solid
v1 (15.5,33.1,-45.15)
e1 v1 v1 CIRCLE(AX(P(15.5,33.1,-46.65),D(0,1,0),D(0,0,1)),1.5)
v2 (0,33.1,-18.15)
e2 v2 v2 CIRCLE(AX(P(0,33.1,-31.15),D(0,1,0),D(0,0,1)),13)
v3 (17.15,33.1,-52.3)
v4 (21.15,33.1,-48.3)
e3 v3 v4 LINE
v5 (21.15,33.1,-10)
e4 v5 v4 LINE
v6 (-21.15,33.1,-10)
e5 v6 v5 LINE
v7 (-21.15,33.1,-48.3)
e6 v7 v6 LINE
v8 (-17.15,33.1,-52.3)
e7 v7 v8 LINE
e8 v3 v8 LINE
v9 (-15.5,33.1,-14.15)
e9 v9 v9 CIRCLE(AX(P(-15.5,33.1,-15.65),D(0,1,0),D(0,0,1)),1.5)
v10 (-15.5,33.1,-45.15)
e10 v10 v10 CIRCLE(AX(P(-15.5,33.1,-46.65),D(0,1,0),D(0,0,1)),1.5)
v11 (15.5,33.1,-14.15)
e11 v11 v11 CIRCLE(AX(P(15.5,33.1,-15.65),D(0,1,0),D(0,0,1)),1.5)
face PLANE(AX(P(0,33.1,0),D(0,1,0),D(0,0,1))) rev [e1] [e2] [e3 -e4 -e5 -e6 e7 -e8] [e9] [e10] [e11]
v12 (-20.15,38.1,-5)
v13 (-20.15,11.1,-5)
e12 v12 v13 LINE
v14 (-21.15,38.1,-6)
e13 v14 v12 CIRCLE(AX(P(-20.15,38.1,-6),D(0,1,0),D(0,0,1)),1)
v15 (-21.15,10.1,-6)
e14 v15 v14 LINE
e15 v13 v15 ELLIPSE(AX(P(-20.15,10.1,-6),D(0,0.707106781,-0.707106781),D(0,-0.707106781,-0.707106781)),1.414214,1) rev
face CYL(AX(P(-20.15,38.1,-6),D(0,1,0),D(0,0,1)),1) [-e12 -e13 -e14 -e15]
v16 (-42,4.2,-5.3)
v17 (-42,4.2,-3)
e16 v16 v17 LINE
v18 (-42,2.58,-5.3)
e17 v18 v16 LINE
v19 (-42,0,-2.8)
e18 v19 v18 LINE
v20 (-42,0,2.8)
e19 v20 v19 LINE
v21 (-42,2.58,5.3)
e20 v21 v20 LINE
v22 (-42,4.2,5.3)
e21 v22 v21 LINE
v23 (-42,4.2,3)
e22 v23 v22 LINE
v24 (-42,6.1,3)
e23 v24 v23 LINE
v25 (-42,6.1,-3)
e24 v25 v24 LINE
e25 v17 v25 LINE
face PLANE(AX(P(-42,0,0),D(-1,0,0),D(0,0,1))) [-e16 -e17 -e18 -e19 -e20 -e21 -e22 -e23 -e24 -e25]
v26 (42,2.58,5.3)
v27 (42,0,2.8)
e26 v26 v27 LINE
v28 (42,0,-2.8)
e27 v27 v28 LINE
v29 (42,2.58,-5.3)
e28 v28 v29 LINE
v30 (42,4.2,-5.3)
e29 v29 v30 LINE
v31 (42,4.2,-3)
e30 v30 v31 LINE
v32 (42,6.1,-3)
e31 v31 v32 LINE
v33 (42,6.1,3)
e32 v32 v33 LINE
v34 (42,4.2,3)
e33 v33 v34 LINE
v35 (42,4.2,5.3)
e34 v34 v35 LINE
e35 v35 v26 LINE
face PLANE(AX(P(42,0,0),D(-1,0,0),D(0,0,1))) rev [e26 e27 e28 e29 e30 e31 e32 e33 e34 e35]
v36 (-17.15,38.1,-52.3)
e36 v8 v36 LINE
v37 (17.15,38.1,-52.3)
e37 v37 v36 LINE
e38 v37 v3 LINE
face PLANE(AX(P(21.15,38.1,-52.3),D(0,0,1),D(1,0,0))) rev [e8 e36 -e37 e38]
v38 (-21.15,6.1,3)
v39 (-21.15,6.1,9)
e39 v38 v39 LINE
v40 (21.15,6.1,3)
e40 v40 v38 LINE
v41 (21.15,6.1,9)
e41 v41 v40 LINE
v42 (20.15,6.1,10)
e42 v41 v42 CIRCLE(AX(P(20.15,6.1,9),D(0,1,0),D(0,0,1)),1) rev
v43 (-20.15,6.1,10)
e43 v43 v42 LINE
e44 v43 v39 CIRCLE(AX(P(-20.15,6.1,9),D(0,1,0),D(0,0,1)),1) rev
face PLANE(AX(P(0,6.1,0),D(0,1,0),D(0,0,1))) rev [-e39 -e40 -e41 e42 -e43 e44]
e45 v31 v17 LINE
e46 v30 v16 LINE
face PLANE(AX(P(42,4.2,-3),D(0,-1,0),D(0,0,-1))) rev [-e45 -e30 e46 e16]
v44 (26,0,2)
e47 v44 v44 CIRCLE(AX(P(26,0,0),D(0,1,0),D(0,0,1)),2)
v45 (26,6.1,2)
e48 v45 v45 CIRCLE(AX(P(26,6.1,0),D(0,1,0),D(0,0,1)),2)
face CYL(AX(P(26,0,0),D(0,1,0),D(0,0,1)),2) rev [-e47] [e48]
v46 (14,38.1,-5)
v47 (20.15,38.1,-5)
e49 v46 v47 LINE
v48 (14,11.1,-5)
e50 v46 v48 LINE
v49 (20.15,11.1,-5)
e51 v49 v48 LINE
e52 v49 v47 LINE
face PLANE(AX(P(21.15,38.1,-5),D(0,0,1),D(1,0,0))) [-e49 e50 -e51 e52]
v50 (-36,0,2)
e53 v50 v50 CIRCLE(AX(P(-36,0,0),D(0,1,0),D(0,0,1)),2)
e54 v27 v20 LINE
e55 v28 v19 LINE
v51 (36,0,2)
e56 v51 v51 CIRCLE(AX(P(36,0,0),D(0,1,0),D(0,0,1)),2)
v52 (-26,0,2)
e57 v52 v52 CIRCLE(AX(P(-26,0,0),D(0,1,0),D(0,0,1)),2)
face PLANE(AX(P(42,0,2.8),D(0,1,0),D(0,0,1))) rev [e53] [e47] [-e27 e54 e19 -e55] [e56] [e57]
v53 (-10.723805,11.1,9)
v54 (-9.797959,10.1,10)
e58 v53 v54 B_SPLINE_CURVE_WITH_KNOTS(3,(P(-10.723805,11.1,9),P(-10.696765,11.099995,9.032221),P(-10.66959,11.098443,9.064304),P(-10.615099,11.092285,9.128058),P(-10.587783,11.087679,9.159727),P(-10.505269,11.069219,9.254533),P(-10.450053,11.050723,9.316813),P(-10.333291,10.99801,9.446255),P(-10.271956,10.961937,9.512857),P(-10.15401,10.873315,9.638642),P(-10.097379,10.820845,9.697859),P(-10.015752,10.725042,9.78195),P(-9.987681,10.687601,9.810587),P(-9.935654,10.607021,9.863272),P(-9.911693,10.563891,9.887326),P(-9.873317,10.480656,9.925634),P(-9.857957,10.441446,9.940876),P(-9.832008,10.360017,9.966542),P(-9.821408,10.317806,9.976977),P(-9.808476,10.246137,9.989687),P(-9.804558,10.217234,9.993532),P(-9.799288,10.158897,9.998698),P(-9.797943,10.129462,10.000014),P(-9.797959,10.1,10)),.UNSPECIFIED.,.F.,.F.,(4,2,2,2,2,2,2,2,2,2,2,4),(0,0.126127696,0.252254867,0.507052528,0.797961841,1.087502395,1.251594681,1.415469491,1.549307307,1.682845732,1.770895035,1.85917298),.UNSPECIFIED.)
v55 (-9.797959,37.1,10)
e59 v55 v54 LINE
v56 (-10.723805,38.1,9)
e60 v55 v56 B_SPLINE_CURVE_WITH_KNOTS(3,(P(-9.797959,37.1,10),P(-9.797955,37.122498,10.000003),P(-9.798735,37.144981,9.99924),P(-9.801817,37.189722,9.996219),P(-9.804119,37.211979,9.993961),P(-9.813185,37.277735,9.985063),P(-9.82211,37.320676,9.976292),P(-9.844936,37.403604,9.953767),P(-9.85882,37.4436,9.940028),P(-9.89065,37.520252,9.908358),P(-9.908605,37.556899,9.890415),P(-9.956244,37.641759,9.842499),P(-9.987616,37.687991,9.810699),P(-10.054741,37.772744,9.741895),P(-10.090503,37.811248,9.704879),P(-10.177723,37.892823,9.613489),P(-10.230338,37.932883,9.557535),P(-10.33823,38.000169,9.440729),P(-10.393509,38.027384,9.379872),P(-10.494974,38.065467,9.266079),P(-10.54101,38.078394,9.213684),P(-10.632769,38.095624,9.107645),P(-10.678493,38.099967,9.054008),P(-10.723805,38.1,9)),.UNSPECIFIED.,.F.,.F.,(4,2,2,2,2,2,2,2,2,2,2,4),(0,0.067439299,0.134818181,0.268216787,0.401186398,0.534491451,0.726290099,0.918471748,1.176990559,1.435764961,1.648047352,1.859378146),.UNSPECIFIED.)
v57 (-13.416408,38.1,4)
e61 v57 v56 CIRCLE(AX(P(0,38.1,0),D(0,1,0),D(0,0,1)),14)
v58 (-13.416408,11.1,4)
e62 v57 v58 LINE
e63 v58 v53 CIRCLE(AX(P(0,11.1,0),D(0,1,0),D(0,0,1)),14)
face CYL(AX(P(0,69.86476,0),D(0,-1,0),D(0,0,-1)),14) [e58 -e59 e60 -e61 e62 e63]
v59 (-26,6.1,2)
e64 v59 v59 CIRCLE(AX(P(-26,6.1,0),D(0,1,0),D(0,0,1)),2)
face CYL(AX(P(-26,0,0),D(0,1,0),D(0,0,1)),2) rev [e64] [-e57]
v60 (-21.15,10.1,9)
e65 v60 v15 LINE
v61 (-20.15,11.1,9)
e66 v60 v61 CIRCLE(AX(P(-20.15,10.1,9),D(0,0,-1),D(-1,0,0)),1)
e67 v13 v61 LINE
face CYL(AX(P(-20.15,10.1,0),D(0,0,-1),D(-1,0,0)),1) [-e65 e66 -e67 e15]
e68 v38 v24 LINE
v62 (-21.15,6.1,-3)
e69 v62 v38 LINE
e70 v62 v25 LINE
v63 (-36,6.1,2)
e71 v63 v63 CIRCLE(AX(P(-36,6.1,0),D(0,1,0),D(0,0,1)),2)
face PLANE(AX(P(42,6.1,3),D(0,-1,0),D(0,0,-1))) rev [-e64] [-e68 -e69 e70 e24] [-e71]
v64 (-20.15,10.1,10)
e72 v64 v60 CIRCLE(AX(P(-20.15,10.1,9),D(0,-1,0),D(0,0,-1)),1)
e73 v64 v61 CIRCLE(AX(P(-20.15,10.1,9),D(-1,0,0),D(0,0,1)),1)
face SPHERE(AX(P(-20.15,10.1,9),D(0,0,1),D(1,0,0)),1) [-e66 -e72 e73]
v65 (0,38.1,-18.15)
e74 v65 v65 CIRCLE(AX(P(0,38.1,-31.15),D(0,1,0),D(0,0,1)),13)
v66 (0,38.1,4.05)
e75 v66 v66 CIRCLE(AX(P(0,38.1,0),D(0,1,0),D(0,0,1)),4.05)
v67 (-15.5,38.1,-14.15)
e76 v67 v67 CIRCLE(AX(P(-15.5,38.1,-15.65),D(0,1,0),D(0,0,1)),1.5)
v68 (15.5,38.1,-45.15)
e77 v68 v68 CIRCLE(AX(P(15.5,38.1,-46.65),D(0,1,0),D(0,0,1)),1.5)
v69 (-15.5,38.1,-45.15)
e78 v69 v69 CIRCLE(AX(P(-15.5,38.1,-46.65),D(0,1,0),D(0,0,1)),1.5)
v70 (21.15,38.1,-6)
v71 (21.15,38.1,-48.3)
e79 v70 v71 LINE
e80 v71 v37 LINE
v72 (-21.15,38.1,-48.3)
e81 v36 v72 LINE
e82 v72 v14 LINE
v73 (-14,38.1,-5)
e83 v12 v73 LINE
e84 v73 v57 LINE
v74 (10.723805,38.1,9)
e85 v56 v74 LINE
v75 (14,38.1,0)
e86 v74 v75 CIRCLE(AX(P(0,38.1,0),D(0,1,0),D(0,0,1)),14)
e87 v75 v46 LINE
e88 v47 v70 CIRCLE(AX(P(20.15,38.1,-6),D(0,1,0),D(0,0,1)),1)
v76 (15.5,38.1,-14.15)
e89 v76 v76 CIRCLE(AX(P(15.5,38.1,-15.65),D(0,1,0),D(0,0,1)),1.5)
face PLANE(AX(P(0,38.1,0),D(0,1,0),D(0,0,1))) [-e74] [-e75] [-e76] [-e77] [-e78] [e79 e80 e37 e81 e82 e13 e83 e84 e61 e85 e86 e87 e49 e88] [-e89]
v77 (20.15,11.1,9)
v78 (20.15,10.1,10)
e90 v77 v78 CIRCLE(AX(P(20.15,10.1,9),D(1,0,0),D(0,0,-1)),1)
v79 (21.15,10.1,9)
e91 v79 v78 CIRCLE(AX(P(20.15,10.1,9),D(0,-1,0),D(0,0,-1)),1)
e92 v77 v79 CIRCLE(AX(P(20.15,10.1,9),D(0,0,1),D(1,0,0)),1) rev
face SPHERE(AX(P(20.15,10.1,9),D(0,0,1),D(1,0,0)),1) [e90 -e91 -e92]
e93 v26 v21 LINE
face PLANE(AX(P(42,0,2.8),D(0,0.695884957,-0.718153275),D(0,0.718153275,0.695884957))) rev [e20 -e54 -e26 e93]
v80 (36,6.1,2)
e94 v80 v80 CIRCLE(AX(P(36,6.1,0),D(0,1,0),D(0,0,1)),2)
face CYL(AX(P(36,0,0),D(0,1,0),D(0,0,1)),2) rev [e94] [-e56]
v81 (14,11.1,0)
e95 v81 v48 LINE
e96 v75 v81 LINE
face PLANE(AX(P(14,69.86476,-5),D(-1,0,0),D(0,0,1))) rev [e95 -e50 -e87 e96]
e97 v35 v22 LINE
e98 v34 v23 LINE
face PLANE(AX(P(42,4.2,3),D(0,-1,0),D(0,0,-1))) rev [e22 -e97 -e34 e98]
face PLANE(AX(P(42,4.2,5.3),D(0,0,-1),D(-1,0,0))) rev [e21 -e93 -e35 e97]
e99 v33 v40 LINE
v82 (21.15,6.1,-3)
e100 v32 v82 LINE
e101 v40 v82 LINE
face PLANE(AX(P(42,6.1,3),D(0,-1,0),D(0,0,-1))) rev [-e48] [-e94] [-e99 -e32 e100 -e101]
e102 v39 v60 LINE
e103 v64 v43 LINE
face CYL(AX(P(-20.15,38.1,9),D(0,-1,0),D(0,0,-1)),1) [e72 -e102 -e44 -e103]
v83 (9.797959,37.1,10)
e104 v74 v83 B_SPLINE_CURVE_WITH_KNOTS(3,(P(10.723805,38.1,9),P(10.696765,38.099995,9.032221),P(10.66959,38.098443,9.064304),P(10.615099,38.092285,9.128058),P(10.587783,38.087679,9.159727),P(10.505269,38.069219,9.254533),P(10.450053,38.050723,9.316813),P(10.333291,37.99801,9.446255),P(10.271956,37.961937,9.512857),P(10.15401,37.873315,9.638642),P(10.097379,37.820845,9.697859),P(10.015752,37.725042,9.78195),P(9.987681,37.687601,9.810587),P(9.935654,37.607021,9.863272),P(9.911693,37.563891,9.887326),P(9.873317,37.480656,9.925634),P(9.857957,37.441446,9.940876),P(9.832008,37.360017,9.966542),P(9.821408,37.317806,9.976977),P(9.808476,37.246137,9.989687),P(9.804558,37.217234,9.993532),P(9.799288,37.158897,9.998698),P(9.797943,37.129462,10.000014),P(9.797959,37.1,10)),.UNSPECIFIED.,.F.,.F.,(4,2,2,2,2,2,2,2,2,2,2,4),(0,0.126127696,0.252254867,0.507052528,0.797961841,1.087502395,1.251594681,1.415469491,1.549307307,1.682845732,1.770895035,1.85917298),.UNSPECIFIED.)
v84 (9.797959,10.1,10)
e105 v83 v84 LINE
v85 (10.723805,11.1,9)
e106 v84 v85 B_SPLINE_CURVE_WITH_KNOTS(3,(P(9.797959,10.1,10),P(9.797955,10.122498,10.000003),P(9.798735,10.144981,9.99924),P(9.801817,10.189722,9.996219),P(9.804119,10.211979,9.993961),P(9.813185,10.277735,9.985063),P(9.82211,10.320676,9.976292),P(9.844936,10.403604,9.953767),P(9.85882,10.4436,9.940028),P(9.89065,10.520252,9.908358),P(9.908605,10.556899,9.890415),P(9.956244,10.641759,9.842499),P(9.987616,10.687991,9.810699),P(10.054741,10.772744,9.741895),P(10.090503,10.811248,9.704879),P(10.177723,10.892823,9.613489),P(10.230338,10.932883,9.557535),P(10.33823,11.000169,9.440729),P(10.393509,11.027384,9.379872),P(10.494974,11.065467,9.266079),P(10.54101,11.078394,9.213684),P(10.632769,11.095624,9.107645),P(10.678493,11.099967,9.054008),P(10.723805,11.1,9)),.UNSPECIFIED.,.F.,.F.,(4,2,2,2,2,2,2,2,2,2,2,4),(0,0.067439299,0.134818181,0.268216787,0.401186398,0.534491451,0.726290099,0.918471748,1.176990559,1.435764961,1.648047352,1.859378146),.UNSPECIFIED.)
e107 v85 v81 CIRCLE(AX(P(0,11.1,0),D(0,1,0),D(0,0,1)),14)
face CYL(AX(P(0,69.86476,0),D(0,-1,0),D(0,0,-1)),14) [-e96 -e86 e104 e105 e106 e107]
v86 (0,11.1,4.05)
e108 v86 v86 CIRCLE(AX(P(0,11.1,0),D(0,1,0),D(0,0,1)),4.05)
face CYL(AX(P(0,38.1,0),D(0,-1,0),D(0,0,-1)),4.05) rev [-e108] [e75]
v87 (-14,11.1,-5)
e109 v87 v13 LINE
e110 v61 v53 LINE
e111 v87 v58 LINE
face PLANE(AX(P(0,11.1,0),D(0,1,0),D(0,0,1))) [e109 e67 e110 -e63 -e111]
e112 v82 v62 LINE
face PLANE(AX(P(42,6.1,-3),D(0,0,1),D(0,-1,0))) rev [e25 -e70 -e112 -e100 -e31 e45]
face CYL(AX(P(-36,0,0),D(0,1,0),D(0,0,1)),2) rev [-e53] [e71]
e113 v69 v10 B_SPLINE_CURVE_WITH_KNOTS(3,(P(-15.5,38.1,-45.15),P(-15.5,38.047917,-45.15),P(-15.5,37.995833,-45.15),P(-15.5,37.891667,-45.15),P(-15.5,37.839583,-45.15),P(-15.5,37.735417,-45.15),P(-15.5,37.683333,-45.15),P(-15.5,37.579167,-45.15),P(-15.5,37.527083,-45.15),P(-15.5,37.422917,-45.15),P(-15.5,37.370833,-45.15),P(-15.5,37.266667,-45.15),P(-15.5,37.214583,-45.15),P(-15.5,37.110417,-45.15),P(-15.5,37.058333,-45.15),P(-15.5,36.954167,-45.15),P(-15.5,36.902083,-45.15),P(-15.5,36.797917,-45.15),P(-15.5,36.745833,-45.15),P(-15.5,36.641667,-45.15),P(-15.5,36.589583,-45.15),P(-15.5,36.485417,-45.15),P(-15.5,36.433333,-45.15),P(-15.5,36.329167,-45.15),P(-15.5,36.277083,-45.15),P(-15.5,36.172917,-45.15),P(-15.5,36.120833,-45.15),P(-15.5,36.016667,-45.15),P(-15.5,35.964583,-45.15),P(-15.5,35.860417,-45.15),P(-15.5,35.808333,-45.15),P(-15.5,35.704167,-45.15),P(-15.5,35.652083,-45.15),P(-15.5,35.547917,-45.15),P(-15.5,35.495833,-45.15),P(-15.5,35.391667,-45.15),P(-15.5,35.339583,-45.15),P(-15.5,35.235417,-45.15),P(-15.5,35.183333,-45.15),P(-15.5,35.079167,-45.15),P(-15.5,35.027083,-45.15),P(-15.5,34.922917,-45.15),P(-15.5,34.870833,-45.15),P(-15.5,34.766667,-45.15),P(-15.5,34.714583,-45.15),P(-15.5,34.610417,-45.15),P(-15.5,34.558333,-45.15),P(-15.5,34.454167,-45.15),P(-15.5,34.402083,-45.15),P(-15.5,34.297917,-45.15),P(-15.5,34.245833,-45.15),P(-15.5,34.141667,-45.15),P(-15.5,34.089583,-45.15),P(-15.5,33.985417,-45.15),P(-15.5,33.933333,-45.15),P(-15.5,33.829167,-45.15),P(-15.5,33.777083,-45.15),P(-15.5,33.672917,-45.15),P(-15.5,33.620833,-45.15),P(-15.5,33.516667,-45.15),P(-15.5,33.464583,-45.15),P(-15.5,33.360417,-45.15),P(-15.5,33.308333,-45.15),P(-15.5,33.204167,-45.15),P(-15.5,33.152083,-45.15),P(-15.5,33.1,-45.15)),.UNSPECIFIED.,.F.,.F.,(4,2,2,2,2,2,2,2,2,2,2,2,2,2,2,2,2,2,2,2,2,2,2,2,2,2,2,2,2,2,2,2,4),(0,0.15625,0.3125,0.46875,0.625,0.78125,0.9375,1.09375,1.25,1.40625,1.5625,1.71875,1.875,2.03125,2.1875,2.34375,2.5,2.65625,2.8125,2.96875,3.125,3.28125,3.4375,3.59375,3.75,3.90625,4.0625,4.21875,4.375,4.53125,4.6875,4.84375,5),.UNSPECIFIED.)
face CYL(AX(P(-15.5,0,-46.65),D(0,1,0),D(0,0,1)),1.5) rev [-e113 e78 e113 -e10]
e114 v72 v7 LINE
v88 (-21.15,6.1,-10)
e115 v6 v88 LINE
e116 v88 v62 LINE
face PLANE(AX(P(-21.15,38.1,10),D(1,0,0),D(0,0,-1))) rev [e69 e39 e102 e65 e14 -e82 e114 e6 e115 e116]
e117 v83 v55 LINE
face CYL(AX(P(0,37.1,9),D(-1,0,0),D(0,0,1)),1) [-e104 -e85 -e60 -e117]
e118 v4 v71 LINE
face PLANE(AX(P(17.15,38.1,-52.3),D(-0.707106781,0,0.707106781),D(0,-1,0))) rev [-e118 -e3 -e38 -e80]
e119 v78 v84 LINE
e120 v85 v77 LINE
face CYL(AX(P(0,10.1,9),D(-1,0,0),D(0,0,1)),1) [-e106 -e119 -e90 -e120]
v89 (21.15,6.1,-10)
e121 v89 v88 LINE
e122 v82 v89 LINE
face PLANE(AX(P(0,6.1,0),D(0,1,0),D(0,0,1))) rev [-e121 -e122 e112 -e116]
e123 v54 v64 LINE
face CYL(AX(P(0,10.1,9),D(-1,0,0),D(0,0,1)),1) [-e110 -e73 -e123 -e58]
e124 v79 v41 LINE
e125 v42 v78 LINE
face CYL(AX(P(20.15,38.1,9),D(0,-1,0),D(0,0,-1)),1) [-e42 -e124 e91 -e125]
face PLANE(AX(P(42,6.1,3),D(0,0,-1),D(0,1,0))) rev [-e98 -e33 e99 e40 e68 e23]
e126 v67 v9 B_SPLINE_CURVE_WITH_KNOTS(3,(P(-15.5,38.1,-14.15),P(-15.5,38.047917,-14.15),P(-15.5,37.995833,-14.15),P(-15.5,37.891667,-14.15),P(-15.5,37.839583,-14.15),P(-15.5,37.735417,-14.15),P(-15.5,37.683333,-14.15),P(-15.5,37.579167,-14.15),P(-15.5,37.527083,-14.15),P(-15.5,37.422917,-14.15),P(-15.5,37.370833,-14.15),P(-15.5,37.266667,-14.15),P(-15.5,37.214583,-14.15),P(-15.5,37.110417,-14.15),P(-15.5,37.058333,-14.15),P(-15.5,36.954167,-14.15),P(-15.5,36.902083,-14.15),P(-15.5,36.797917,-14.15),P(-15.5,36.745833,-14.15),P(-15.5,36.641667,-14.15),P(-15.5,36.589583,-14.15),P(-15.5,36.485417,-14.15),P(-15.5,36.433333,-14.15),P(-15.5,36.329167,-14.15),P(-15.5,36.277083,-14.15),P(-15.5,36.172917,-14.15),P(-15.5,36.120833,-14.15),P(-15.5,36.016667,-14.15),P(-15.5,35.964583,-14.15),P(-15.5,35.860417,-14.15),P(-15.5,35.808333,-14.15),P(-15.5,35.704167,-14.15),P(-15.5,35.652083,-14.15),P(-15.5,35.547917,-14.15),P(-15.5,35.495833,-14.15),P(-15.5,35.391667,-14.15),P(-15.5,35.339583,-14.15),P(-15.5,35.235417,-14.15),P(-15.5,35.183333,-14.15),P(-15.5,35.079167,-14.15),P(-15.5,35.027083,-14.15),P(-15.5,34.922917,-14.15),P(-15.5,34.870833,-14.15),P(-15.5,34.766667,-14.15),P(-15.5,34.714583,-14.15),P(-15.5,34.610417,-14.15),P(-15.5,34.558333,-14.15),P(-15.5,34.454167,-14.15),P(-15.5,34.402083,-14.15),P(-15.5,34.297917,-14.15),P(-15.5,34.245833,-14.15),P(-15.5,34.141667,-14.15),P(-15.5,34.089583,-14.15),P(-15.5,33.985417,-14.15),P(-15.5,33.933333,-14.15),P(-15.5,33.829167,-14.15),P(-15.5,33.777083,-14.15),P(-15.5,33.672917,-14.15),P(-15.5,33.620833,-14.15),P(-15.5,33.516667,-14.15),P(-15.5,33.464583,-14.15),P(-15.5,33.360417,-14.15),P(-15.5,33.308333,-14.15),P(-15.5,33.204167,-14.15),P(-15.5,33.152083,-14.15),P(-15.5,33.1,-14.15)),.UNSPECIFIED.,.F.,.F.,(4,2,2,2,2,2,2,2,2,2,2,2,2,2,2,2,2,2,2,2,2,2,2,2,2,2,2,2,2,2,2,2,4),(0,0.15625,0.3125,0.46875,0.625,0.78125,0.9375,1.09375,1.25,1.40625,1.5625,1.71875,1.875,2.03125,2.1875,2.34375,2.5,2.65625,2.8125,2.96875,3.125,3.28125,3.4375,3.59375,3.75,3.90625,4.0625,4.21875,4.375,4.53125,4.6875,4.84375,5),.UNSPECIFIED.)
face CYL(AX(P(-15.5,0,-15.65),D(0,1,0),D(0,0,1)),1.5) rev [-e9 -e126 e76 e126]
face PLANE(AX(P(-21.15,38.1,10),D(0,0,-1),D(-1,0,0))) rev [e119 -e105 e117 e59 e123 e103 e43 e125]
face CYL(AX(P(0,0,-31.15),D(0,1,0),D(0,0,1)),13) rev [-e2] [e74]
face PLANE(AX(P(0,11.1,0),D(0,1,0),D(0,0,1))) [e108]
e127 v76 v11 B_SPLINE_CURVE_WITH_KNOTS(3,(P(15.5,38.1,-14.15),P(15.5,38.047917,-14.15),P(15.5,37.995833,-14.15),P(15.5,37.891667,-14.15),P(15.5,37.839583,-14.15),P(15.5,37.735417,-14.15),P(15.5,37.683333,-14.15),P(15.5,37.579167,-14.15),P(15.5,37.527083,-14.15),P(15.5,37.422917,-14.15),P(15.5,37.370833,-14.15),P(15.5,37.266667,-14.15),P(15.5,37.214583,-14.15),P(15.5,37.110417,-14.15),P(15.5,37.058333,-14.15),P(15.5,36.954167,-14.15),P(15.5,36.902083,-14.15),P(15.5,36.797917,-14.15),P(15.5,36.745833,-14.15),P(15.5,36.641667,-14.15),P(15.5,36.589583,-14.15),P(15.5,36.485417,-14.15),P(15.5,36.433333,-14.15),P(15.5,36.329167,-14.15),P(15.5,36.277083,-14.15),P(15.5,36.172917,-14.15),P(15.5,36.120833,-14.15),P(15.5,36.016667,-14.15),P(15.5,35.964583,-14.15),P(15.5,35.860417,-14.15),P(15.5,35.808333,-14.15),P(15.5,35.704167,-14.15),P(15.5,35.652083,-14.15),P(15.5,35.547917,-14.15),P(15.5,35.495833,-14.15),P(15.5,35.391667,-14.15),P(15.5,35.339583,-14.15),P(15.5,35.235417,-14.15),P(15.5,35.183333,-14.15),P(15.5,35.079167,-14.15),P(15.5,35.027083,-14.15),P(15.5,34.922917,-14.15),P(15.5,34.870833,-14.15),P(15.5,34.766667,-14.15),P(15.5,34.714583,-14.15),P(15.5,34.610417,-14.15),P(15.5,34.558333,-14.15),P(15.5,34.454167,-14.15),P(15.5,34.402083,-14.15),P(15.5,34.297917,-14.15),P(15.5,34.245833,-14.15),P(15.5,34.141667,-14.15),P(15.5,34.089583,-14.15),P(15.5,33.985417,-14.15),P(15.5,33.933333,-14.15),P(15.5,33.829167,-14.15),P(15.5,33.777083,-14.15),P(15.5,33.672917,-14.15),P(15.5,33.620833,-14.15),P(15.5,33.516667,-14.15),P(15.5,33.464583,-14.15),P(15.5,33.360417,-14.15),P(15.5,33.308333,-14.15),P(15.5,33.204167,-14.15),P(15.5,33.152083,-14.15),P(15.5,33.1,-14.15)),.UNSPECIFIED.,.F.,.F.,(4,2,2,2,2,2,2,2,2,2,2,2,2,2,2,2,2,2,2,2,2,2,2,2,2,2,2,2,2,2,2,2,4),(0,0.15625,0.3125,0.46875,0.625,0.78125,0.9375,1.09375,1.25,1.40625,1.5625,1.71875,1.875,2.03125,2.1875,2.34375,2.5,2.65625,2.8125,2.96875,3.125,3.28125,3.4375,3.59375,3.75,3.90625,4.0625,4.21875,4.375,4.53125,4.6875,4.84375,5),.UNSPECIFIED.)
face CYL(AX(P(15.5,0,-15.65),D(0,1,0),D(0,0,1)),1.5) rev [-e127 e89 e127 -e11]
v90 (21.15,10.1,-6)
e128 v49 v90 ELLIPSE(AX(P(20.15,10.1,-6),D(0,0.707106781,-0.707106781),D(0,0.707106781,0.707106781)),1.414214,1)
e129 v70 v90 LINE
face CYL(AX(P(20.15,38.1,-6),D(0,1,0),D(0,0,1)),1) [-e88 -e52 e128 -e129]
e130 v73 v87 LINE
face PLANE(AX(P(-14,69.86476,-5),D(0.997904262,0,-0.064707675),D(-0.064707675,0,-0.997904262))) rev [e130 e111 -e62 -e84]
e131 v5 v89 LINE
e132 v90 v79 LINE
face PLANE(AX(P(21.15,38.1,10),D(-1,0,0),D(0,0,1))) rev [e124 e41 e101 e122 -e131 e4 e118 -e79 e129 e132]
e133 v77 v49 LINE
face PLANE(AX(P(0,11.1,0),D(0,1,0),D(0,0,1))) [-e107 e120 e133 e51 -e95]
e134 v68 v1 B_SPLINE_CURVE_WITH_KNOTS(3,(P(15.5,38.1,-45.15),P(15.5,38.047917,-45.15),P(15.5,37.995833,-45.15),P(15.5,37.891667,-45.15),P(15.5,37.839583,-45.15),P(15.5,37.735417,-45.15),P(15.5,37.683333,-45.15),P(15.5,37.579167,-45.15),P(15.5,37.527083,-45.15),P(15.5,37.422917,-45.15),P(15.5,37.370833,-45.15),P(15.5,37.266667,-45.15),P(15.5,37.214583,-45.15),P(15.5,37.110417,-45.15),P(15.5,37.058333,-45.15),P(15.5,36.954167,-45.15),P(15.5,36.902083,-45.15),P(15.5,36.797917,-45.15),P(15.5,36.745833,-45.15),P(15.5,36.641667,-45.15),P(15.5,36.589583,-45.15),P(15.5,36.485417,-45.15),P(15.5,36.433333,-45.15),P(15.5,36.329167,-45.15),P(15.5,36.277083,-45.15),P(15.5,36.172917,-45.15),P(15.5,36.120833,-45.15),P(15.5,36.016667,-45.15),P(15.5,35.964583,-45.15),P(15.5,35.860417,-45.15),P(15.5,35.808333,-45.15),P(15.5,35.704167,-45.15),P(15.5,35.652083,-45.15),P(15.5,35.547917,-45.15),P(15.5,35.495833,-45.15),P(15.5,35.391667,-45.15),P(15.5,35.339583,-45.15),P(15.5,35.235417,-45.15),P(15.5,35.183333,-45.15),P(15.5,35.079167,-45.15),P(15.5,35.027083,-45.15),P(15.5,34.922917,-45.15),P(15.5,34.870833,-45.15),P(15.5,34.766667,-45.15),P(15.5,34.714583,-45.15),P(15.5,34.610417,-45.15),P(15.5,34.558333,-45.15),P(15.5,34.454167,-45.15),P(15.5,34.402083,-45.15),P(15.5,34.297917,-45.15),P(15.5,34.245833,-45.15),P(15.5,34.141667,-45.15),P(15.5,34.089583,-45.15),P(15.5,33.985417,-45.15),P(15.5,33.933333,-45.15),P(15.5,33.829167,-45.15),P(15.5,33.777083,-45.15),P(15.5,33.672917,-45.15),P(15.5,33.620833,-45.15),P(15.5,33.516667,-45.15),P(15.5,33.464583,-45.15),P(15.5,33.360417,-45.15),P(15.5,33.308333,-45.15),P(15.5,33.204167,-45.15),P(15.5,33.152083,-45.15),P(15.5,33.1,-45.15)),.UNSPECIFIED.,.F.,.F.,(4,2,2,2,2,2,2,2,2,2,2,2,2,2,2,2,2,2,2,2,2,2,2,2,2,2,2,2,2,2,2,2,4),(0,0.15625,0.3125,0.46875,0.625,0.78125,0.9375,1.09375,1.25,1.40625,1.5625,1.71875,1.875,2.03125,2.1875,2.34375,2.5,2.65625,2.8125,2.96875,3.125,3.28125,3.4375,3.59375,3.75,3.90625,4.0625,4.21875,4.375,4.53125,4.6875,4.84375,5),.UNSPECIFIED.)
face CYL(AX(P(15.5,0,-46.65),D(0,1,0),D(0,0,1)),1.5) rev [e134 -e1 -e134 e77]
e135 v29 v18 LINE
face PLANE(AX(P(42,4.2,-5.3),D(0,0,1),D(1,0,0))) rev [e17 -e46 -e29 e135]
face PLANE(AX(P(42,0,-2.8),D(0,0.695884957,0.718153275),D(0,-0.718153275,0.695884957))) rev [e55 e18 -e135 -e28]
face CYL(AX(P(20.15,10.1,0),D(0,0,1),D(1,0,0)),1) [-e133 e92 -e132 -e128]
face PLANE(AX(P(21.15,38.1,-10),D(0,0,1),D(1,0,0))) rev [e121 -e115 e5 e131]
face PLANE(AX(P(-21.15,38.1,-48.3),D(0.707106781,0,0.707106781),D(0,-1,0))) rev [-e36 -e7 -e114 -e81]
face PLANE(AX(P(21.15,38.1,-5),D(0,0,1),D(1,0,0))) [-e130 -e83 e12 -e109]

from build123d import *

# Parameters (mm, degrees)
BOSS_EXTRUDE1_DEPTH     = 42
SKETCH2_W               = 42.3
SKETCH2_H               = 20
BOSS_EXTRUDE2_DEPTH     = 32
SKETCH3_W               = 42.3
SKETCH3_H               = 42.3
BOSS_EXTRUDE3_DEPTH     = 5
SHELL2_START            = 11.1
SHELL2_OUTLINE_W        = 42.3
SHELL2_OUTLINE_H        = 15
SHELL2_DEPTH            = 27
CHAMFER2_SIZE           = 4
CUT_EXTRUDE1_DEPTH      = 75.799064165
CUT_EXTRUDE1_DEPTH_BACK = 75.799064165
SKETCH4_R               = 13
FILLET1_R               = 1
BOSS_EXTRUDE4_DEPTH     = 27
SKETCH18_R              = 4.05
CUT_EXTRUDE2_DEPTH      = 73.306915299
FILLET8_R               = 1
SKETCH19_R              = 1.5
CUT_EXTRUDE3_DEPTH      = 78.142076716
SKETCH20_R              = 2
CUT_EXTRUDE4_DEPTH      = 75.318840185


# Read off the part's stored shape, not the designer's step: Shell2
with BuildPart() as part:
    # Sketch1 → Boss-Extrude1 (new, symmetric)
    with BuildSketch(Plane(origin=(0, 0, 0), x_dir=(0, 0, -1), z_dir=(1, 0, 0))):
        Polygon((-3, 6.1), (3, 6.1), (3, 4.2), (5.3, 4.2), (5.3, 2.58), (2.8, 0), (-2.8, 0), (-5.3, 2.58), (-5.3, 4.2), (-3, 4.2), align=None)
    extrude(amount=BOSS_EXTRUDE1_DEPTH, both=True)

    # Sketch2 → Boss-Extrude2 (add)
    with BuildSketch(Plane(origin=(0, 6.1, 0), x_dir=(1, 0, 0), z_dir=(0, 1, 0))):
        Rectangle(SKETCH2_W, SKETCH2_H)
    extrude(amount=BOSS_EXTRUDE2_DEPTH)

    # Sketch3 → Boss-Extrude3 (add)
    with BuildSketch(Plane(origin=(0, 33.1, 0), x_dir=(1, 0, 0), z_dir=(0, 1, 0))):
        with Locations((0, 31.15)):
            Rectangle(SKETCH3_W, SKETCH3_H)
    extrude(amount=BOSS_EXTRUDE3_DEPTH)

    # Shell2 outline → Shell2 (cut)
    with BuildSketch(Plane(origin=(0, 0, 0), x_dir=(1, 0, 0), z_dir=(0, 1, 0)).offset(SHELL2_START)):
        with Locations((0, -2.5)):
            Rectangle(SHELL2_OUTLINE_W, SHELL2_OUTLINE_H)
    extrude(amount=SHELL2_DEPTH, mode=Mode.SUBTRACT)

    # Chamfer2
    chamfer2_edges = [part.edges().sort_by_distance(p)[0] for p in [
        (21.15, 35.6, -52.3),
        (-21.15, 35.6, -52.3),
    ]]
    chamfer(chamfer2_edges, length=CHAMFER2_SIZE)

    # Sketch4 → Cut-Extrude1 (cut, two sides: drawn at the far end of the back side and taken through both)
    with BuildSketch(Plane(origin=(0, 33.1, 0), x_dir=(1, 0, 0), z_dir=(0, 1, 0)).offset(-CUT_EXTRUDE1_DEPTH_BACK)):
        with Locations(Location((0, 31.15, 0), (0, 0, 270))):
            Circle(SKETCH4_R)
    extrude(amount=CUT_EXTRUDE1_DEPTH + CUT_EXTRUDE1_DEPTH_BACK, mode=Mode.SUBTRACT)

    # Fillet1
    fillet1_edges = [part.edges().sort_by_distance(p)[0] for p in [
        (-21.15, 8.6, 10),
        (21.15, 8.6, 10),
        (-21.15, 11.1, 2.5),
        (-21.15, 24.6, -5),
        (21.15, 11.1, 2.5),
        (21.15, 24.6, -5),
    ]]
    fillet(fillet1_edges, radius=FILLET1_R)

    # Sketch17 → Boss-Extrude4 (add)
    with BuildSketch(Plane(origin=(0, 11.1, 0), x_dir=(1, 0, 0), z_dir=(0, 1, 0))):
        with BuildLine():
            Line((14, 5), (-14, 5))
            Line((-14, 5), (-13.416407865, -4))
            ThreePointArc((-13.416407865, -4), (-11.98860738, -7.230027185), (-9.797958971, -10))
            Line((-9.797958971, -10), (9.797958971, -10))
            ThreePointArc((9.797958971, -10), (12.906808777, -5.423494003), (14, 0))
            Line((14, 0), (14, 5))
        make_face()
    extrude(amount=BOSS_EXTRUDE4_DEPTH)

    # Sketch18 → Cut-Extrude2 (cut, through all)
    with BuildSketch(Plane(origin=(0, 11.1, 0), x_dir=(1, 0, 0), z_dir=(0, 1, 0))):
        with Locations(Location((0, 0, 0), (0, 0, 270))):
            Circle(SKETCH18_R)
    extrude(amount=CUT_EXTRUDE2_DEPTH, mode=Mode.SUBTRACT)

    # Fillet8
    # the kernel refuses this fillet: 1 mm, written as the material it takes off along each edge
    with BuildSketch(Plane(origin=(-20.15, 10.1, 9), x_dir=(0, 1, 0), z_dir=(0, 0, 1))) as fillet8_piece_1_section:
        Polygon((0, 0), (FILLET8_R, 0), (FILLET8_R, FILLET8_R), (0, FILLET8_R), align=None)
    fillet8_piece_1 = extrude(amount=FILLET8_R, mode=Mode.PRIVATE)
    fillet8_piece_1 = fillet8_piece_1 - Plane(origin=(-20.15, 10.1, 9), x_dir=(0.7071067811865475, -0.7071067811865475, 0), z_dir=(0, 0, 1)) * Sphere(FILLET8_R, mode=Mode.PRIVATE)
    add(fillet8_piece_1, mode=Mode.SUBTRACT)
    with BuildSketch(Plane(origin=(20.15, 10.1, 9), x_dir=(0, 1, 0), z_dir=(0, 0, 1))) as fillet8_piece_2_section:
        Polygon((0, 0), (FILLET8_R, 0), (FILLET8_R, -FILLET8_R), (0, -FILLET8_R), align=None)
    fillet8_piece_2 = extrude(amount=FILLET8_R, mode=Mode.PRIVATE)
    fillet8_piece_2 = fillet8_piece_2 - Plane(origin=(20.15, 10.1, 9), x_dir=(-0.7071067811865475, -0.7071067811865475, 0), z_dir=(0, 0, 1)) * Sphere(FILLET8_R, mode=Mode.PRIVATE)
    add(fillet8_piece_2, mode=Mode.SUBTRACT)
    with BuildSketch(Plane(origin=(7.297958971, 11.1, 10), x_dir=(0, -1, 0), z_dir=(1, 0, 0))) as fillet8_piece_3_section:
        with BuildLine():
            CenterArc((FILLET8_R, FILLET8_R), FILLET8_R, 180, 90)
            Line((0, FILLET8_R), (0, 0))
            Line((0, 0), (FILLET8_R, 0))
        make_face()
    fillet8_piece_3 = extrude(amount=12.852041029, mode=Mode.PRIVATE)
    fillet8_piece_3 = fillet8_piece_3 - Plane(origin=(0, 10.87099501, 0), x_dir=(0.6998542122237654, 0, 0.7142857142857142), z_dir=(0, -1, 0)) * Cylinder(14, 30, mode=Mode.PRIVATE)
    add(fillet8_piece_3, mode=Mode.SUBTRACT)
    with BuildSketch(Plane(origin=(-12.297958971, 38.1, 10), x_dir=(0, 0, -1), z_dir=(1, 0, 0))) as fillet8_piece_4:
        with BuildLine():
            CenterArc((FILLET8_R, -FILLET8_R), FILLET8_R, 90, 90)
            Line((0, -FILLET8_R), (0, 0))
            Line((0, 0), (FILLET8_R, 0))
        make_face()
    extrude(amount=24.595917942, mode=Mode.SUBTRACT)
    with BuildSketch(Plane(origin=(-20.15, 11.1, 10), x_dir=(0, -1, 0), z_dir=(1, 0, 0))) as fillet8_piece_5_section:
        with BuildLine():
            CenterArc((FILLET8_R, FILLET8_R), FILLET8_R, 180, 90)
            Line((0, FILLET8_R), (0, 0))
            Line((0, 0), (FILLET8_R, 0))
        make_face()
    fillet8_piece_5 = extrude(amount=12.852041029, mode=Mode.PRIVATE)
    fillet8_piece_5 = fillet8_piece_5 - Plane(origin=(0, 10.870994427, 0), x_dir=(-0.9583148474999099, 0, 0.28571428571428575), z_dir=(0, -1, 0)) * Cylinder(14, 30, mode=Mode.PRIVATE)
    add(fillet8_piece_5, mode=Mode.SUBTRACT)

    # Sketch19 → Cut-Extrude3 (cut, through all)
    with BuildSketch(Plane(origin=(0, 38.1, 0), x_dir=(1, 0, 0), z_dir=(0, 1, 0))):
        with Locations(Location((-15.5, 46.65, 0), (0, 0, 270))):
            Circle(SKETCH19_R)
        with Locations(Location((15.5, 46.65, 0), (0, 0, 270))):
            Circle(SKETCH19_R)
        with Locations(Location((15.5, 15.65, 0), (0, 0, 270))):
            Circle(SKETCH19_R)
        with Locations(Location((-15.5, 15.65, 0), (0, 0, 270))):
            Circle(SKETCH19_R)
    extrude(amount=-CUT_EXTRUDE3_DEPTH, mode=Mode.SUBTRACT)

    # Sketch20 → Cut-Extrude4 (cut, through all)
    with BuildSketch(Plane(origin=(0, 6.1, 0), x_dir=(1, 0, 0), z_dir=(0, 1, 0))):
        with Locations(Location((36, 0, 0), (0, 0, 270))):
            Circle(SKETCH20_R)
        with Locations(Location((26, 0, 0), (0, 0, 270))):
            Circle(SKETCH20_R)
        with Locations(Location((-26, 0, 0), (0, 0, 270))):
            Circle(SKETCH20_R)
        with Locations(Location((-36, 0, 0), (0, 0, 270))):
            Circle(SKETCH20_R)
    extrude(amount=-CUT_EXTRUDE4_DEPTH, mode=Mode.SUBTRACT)


solid = part.part
